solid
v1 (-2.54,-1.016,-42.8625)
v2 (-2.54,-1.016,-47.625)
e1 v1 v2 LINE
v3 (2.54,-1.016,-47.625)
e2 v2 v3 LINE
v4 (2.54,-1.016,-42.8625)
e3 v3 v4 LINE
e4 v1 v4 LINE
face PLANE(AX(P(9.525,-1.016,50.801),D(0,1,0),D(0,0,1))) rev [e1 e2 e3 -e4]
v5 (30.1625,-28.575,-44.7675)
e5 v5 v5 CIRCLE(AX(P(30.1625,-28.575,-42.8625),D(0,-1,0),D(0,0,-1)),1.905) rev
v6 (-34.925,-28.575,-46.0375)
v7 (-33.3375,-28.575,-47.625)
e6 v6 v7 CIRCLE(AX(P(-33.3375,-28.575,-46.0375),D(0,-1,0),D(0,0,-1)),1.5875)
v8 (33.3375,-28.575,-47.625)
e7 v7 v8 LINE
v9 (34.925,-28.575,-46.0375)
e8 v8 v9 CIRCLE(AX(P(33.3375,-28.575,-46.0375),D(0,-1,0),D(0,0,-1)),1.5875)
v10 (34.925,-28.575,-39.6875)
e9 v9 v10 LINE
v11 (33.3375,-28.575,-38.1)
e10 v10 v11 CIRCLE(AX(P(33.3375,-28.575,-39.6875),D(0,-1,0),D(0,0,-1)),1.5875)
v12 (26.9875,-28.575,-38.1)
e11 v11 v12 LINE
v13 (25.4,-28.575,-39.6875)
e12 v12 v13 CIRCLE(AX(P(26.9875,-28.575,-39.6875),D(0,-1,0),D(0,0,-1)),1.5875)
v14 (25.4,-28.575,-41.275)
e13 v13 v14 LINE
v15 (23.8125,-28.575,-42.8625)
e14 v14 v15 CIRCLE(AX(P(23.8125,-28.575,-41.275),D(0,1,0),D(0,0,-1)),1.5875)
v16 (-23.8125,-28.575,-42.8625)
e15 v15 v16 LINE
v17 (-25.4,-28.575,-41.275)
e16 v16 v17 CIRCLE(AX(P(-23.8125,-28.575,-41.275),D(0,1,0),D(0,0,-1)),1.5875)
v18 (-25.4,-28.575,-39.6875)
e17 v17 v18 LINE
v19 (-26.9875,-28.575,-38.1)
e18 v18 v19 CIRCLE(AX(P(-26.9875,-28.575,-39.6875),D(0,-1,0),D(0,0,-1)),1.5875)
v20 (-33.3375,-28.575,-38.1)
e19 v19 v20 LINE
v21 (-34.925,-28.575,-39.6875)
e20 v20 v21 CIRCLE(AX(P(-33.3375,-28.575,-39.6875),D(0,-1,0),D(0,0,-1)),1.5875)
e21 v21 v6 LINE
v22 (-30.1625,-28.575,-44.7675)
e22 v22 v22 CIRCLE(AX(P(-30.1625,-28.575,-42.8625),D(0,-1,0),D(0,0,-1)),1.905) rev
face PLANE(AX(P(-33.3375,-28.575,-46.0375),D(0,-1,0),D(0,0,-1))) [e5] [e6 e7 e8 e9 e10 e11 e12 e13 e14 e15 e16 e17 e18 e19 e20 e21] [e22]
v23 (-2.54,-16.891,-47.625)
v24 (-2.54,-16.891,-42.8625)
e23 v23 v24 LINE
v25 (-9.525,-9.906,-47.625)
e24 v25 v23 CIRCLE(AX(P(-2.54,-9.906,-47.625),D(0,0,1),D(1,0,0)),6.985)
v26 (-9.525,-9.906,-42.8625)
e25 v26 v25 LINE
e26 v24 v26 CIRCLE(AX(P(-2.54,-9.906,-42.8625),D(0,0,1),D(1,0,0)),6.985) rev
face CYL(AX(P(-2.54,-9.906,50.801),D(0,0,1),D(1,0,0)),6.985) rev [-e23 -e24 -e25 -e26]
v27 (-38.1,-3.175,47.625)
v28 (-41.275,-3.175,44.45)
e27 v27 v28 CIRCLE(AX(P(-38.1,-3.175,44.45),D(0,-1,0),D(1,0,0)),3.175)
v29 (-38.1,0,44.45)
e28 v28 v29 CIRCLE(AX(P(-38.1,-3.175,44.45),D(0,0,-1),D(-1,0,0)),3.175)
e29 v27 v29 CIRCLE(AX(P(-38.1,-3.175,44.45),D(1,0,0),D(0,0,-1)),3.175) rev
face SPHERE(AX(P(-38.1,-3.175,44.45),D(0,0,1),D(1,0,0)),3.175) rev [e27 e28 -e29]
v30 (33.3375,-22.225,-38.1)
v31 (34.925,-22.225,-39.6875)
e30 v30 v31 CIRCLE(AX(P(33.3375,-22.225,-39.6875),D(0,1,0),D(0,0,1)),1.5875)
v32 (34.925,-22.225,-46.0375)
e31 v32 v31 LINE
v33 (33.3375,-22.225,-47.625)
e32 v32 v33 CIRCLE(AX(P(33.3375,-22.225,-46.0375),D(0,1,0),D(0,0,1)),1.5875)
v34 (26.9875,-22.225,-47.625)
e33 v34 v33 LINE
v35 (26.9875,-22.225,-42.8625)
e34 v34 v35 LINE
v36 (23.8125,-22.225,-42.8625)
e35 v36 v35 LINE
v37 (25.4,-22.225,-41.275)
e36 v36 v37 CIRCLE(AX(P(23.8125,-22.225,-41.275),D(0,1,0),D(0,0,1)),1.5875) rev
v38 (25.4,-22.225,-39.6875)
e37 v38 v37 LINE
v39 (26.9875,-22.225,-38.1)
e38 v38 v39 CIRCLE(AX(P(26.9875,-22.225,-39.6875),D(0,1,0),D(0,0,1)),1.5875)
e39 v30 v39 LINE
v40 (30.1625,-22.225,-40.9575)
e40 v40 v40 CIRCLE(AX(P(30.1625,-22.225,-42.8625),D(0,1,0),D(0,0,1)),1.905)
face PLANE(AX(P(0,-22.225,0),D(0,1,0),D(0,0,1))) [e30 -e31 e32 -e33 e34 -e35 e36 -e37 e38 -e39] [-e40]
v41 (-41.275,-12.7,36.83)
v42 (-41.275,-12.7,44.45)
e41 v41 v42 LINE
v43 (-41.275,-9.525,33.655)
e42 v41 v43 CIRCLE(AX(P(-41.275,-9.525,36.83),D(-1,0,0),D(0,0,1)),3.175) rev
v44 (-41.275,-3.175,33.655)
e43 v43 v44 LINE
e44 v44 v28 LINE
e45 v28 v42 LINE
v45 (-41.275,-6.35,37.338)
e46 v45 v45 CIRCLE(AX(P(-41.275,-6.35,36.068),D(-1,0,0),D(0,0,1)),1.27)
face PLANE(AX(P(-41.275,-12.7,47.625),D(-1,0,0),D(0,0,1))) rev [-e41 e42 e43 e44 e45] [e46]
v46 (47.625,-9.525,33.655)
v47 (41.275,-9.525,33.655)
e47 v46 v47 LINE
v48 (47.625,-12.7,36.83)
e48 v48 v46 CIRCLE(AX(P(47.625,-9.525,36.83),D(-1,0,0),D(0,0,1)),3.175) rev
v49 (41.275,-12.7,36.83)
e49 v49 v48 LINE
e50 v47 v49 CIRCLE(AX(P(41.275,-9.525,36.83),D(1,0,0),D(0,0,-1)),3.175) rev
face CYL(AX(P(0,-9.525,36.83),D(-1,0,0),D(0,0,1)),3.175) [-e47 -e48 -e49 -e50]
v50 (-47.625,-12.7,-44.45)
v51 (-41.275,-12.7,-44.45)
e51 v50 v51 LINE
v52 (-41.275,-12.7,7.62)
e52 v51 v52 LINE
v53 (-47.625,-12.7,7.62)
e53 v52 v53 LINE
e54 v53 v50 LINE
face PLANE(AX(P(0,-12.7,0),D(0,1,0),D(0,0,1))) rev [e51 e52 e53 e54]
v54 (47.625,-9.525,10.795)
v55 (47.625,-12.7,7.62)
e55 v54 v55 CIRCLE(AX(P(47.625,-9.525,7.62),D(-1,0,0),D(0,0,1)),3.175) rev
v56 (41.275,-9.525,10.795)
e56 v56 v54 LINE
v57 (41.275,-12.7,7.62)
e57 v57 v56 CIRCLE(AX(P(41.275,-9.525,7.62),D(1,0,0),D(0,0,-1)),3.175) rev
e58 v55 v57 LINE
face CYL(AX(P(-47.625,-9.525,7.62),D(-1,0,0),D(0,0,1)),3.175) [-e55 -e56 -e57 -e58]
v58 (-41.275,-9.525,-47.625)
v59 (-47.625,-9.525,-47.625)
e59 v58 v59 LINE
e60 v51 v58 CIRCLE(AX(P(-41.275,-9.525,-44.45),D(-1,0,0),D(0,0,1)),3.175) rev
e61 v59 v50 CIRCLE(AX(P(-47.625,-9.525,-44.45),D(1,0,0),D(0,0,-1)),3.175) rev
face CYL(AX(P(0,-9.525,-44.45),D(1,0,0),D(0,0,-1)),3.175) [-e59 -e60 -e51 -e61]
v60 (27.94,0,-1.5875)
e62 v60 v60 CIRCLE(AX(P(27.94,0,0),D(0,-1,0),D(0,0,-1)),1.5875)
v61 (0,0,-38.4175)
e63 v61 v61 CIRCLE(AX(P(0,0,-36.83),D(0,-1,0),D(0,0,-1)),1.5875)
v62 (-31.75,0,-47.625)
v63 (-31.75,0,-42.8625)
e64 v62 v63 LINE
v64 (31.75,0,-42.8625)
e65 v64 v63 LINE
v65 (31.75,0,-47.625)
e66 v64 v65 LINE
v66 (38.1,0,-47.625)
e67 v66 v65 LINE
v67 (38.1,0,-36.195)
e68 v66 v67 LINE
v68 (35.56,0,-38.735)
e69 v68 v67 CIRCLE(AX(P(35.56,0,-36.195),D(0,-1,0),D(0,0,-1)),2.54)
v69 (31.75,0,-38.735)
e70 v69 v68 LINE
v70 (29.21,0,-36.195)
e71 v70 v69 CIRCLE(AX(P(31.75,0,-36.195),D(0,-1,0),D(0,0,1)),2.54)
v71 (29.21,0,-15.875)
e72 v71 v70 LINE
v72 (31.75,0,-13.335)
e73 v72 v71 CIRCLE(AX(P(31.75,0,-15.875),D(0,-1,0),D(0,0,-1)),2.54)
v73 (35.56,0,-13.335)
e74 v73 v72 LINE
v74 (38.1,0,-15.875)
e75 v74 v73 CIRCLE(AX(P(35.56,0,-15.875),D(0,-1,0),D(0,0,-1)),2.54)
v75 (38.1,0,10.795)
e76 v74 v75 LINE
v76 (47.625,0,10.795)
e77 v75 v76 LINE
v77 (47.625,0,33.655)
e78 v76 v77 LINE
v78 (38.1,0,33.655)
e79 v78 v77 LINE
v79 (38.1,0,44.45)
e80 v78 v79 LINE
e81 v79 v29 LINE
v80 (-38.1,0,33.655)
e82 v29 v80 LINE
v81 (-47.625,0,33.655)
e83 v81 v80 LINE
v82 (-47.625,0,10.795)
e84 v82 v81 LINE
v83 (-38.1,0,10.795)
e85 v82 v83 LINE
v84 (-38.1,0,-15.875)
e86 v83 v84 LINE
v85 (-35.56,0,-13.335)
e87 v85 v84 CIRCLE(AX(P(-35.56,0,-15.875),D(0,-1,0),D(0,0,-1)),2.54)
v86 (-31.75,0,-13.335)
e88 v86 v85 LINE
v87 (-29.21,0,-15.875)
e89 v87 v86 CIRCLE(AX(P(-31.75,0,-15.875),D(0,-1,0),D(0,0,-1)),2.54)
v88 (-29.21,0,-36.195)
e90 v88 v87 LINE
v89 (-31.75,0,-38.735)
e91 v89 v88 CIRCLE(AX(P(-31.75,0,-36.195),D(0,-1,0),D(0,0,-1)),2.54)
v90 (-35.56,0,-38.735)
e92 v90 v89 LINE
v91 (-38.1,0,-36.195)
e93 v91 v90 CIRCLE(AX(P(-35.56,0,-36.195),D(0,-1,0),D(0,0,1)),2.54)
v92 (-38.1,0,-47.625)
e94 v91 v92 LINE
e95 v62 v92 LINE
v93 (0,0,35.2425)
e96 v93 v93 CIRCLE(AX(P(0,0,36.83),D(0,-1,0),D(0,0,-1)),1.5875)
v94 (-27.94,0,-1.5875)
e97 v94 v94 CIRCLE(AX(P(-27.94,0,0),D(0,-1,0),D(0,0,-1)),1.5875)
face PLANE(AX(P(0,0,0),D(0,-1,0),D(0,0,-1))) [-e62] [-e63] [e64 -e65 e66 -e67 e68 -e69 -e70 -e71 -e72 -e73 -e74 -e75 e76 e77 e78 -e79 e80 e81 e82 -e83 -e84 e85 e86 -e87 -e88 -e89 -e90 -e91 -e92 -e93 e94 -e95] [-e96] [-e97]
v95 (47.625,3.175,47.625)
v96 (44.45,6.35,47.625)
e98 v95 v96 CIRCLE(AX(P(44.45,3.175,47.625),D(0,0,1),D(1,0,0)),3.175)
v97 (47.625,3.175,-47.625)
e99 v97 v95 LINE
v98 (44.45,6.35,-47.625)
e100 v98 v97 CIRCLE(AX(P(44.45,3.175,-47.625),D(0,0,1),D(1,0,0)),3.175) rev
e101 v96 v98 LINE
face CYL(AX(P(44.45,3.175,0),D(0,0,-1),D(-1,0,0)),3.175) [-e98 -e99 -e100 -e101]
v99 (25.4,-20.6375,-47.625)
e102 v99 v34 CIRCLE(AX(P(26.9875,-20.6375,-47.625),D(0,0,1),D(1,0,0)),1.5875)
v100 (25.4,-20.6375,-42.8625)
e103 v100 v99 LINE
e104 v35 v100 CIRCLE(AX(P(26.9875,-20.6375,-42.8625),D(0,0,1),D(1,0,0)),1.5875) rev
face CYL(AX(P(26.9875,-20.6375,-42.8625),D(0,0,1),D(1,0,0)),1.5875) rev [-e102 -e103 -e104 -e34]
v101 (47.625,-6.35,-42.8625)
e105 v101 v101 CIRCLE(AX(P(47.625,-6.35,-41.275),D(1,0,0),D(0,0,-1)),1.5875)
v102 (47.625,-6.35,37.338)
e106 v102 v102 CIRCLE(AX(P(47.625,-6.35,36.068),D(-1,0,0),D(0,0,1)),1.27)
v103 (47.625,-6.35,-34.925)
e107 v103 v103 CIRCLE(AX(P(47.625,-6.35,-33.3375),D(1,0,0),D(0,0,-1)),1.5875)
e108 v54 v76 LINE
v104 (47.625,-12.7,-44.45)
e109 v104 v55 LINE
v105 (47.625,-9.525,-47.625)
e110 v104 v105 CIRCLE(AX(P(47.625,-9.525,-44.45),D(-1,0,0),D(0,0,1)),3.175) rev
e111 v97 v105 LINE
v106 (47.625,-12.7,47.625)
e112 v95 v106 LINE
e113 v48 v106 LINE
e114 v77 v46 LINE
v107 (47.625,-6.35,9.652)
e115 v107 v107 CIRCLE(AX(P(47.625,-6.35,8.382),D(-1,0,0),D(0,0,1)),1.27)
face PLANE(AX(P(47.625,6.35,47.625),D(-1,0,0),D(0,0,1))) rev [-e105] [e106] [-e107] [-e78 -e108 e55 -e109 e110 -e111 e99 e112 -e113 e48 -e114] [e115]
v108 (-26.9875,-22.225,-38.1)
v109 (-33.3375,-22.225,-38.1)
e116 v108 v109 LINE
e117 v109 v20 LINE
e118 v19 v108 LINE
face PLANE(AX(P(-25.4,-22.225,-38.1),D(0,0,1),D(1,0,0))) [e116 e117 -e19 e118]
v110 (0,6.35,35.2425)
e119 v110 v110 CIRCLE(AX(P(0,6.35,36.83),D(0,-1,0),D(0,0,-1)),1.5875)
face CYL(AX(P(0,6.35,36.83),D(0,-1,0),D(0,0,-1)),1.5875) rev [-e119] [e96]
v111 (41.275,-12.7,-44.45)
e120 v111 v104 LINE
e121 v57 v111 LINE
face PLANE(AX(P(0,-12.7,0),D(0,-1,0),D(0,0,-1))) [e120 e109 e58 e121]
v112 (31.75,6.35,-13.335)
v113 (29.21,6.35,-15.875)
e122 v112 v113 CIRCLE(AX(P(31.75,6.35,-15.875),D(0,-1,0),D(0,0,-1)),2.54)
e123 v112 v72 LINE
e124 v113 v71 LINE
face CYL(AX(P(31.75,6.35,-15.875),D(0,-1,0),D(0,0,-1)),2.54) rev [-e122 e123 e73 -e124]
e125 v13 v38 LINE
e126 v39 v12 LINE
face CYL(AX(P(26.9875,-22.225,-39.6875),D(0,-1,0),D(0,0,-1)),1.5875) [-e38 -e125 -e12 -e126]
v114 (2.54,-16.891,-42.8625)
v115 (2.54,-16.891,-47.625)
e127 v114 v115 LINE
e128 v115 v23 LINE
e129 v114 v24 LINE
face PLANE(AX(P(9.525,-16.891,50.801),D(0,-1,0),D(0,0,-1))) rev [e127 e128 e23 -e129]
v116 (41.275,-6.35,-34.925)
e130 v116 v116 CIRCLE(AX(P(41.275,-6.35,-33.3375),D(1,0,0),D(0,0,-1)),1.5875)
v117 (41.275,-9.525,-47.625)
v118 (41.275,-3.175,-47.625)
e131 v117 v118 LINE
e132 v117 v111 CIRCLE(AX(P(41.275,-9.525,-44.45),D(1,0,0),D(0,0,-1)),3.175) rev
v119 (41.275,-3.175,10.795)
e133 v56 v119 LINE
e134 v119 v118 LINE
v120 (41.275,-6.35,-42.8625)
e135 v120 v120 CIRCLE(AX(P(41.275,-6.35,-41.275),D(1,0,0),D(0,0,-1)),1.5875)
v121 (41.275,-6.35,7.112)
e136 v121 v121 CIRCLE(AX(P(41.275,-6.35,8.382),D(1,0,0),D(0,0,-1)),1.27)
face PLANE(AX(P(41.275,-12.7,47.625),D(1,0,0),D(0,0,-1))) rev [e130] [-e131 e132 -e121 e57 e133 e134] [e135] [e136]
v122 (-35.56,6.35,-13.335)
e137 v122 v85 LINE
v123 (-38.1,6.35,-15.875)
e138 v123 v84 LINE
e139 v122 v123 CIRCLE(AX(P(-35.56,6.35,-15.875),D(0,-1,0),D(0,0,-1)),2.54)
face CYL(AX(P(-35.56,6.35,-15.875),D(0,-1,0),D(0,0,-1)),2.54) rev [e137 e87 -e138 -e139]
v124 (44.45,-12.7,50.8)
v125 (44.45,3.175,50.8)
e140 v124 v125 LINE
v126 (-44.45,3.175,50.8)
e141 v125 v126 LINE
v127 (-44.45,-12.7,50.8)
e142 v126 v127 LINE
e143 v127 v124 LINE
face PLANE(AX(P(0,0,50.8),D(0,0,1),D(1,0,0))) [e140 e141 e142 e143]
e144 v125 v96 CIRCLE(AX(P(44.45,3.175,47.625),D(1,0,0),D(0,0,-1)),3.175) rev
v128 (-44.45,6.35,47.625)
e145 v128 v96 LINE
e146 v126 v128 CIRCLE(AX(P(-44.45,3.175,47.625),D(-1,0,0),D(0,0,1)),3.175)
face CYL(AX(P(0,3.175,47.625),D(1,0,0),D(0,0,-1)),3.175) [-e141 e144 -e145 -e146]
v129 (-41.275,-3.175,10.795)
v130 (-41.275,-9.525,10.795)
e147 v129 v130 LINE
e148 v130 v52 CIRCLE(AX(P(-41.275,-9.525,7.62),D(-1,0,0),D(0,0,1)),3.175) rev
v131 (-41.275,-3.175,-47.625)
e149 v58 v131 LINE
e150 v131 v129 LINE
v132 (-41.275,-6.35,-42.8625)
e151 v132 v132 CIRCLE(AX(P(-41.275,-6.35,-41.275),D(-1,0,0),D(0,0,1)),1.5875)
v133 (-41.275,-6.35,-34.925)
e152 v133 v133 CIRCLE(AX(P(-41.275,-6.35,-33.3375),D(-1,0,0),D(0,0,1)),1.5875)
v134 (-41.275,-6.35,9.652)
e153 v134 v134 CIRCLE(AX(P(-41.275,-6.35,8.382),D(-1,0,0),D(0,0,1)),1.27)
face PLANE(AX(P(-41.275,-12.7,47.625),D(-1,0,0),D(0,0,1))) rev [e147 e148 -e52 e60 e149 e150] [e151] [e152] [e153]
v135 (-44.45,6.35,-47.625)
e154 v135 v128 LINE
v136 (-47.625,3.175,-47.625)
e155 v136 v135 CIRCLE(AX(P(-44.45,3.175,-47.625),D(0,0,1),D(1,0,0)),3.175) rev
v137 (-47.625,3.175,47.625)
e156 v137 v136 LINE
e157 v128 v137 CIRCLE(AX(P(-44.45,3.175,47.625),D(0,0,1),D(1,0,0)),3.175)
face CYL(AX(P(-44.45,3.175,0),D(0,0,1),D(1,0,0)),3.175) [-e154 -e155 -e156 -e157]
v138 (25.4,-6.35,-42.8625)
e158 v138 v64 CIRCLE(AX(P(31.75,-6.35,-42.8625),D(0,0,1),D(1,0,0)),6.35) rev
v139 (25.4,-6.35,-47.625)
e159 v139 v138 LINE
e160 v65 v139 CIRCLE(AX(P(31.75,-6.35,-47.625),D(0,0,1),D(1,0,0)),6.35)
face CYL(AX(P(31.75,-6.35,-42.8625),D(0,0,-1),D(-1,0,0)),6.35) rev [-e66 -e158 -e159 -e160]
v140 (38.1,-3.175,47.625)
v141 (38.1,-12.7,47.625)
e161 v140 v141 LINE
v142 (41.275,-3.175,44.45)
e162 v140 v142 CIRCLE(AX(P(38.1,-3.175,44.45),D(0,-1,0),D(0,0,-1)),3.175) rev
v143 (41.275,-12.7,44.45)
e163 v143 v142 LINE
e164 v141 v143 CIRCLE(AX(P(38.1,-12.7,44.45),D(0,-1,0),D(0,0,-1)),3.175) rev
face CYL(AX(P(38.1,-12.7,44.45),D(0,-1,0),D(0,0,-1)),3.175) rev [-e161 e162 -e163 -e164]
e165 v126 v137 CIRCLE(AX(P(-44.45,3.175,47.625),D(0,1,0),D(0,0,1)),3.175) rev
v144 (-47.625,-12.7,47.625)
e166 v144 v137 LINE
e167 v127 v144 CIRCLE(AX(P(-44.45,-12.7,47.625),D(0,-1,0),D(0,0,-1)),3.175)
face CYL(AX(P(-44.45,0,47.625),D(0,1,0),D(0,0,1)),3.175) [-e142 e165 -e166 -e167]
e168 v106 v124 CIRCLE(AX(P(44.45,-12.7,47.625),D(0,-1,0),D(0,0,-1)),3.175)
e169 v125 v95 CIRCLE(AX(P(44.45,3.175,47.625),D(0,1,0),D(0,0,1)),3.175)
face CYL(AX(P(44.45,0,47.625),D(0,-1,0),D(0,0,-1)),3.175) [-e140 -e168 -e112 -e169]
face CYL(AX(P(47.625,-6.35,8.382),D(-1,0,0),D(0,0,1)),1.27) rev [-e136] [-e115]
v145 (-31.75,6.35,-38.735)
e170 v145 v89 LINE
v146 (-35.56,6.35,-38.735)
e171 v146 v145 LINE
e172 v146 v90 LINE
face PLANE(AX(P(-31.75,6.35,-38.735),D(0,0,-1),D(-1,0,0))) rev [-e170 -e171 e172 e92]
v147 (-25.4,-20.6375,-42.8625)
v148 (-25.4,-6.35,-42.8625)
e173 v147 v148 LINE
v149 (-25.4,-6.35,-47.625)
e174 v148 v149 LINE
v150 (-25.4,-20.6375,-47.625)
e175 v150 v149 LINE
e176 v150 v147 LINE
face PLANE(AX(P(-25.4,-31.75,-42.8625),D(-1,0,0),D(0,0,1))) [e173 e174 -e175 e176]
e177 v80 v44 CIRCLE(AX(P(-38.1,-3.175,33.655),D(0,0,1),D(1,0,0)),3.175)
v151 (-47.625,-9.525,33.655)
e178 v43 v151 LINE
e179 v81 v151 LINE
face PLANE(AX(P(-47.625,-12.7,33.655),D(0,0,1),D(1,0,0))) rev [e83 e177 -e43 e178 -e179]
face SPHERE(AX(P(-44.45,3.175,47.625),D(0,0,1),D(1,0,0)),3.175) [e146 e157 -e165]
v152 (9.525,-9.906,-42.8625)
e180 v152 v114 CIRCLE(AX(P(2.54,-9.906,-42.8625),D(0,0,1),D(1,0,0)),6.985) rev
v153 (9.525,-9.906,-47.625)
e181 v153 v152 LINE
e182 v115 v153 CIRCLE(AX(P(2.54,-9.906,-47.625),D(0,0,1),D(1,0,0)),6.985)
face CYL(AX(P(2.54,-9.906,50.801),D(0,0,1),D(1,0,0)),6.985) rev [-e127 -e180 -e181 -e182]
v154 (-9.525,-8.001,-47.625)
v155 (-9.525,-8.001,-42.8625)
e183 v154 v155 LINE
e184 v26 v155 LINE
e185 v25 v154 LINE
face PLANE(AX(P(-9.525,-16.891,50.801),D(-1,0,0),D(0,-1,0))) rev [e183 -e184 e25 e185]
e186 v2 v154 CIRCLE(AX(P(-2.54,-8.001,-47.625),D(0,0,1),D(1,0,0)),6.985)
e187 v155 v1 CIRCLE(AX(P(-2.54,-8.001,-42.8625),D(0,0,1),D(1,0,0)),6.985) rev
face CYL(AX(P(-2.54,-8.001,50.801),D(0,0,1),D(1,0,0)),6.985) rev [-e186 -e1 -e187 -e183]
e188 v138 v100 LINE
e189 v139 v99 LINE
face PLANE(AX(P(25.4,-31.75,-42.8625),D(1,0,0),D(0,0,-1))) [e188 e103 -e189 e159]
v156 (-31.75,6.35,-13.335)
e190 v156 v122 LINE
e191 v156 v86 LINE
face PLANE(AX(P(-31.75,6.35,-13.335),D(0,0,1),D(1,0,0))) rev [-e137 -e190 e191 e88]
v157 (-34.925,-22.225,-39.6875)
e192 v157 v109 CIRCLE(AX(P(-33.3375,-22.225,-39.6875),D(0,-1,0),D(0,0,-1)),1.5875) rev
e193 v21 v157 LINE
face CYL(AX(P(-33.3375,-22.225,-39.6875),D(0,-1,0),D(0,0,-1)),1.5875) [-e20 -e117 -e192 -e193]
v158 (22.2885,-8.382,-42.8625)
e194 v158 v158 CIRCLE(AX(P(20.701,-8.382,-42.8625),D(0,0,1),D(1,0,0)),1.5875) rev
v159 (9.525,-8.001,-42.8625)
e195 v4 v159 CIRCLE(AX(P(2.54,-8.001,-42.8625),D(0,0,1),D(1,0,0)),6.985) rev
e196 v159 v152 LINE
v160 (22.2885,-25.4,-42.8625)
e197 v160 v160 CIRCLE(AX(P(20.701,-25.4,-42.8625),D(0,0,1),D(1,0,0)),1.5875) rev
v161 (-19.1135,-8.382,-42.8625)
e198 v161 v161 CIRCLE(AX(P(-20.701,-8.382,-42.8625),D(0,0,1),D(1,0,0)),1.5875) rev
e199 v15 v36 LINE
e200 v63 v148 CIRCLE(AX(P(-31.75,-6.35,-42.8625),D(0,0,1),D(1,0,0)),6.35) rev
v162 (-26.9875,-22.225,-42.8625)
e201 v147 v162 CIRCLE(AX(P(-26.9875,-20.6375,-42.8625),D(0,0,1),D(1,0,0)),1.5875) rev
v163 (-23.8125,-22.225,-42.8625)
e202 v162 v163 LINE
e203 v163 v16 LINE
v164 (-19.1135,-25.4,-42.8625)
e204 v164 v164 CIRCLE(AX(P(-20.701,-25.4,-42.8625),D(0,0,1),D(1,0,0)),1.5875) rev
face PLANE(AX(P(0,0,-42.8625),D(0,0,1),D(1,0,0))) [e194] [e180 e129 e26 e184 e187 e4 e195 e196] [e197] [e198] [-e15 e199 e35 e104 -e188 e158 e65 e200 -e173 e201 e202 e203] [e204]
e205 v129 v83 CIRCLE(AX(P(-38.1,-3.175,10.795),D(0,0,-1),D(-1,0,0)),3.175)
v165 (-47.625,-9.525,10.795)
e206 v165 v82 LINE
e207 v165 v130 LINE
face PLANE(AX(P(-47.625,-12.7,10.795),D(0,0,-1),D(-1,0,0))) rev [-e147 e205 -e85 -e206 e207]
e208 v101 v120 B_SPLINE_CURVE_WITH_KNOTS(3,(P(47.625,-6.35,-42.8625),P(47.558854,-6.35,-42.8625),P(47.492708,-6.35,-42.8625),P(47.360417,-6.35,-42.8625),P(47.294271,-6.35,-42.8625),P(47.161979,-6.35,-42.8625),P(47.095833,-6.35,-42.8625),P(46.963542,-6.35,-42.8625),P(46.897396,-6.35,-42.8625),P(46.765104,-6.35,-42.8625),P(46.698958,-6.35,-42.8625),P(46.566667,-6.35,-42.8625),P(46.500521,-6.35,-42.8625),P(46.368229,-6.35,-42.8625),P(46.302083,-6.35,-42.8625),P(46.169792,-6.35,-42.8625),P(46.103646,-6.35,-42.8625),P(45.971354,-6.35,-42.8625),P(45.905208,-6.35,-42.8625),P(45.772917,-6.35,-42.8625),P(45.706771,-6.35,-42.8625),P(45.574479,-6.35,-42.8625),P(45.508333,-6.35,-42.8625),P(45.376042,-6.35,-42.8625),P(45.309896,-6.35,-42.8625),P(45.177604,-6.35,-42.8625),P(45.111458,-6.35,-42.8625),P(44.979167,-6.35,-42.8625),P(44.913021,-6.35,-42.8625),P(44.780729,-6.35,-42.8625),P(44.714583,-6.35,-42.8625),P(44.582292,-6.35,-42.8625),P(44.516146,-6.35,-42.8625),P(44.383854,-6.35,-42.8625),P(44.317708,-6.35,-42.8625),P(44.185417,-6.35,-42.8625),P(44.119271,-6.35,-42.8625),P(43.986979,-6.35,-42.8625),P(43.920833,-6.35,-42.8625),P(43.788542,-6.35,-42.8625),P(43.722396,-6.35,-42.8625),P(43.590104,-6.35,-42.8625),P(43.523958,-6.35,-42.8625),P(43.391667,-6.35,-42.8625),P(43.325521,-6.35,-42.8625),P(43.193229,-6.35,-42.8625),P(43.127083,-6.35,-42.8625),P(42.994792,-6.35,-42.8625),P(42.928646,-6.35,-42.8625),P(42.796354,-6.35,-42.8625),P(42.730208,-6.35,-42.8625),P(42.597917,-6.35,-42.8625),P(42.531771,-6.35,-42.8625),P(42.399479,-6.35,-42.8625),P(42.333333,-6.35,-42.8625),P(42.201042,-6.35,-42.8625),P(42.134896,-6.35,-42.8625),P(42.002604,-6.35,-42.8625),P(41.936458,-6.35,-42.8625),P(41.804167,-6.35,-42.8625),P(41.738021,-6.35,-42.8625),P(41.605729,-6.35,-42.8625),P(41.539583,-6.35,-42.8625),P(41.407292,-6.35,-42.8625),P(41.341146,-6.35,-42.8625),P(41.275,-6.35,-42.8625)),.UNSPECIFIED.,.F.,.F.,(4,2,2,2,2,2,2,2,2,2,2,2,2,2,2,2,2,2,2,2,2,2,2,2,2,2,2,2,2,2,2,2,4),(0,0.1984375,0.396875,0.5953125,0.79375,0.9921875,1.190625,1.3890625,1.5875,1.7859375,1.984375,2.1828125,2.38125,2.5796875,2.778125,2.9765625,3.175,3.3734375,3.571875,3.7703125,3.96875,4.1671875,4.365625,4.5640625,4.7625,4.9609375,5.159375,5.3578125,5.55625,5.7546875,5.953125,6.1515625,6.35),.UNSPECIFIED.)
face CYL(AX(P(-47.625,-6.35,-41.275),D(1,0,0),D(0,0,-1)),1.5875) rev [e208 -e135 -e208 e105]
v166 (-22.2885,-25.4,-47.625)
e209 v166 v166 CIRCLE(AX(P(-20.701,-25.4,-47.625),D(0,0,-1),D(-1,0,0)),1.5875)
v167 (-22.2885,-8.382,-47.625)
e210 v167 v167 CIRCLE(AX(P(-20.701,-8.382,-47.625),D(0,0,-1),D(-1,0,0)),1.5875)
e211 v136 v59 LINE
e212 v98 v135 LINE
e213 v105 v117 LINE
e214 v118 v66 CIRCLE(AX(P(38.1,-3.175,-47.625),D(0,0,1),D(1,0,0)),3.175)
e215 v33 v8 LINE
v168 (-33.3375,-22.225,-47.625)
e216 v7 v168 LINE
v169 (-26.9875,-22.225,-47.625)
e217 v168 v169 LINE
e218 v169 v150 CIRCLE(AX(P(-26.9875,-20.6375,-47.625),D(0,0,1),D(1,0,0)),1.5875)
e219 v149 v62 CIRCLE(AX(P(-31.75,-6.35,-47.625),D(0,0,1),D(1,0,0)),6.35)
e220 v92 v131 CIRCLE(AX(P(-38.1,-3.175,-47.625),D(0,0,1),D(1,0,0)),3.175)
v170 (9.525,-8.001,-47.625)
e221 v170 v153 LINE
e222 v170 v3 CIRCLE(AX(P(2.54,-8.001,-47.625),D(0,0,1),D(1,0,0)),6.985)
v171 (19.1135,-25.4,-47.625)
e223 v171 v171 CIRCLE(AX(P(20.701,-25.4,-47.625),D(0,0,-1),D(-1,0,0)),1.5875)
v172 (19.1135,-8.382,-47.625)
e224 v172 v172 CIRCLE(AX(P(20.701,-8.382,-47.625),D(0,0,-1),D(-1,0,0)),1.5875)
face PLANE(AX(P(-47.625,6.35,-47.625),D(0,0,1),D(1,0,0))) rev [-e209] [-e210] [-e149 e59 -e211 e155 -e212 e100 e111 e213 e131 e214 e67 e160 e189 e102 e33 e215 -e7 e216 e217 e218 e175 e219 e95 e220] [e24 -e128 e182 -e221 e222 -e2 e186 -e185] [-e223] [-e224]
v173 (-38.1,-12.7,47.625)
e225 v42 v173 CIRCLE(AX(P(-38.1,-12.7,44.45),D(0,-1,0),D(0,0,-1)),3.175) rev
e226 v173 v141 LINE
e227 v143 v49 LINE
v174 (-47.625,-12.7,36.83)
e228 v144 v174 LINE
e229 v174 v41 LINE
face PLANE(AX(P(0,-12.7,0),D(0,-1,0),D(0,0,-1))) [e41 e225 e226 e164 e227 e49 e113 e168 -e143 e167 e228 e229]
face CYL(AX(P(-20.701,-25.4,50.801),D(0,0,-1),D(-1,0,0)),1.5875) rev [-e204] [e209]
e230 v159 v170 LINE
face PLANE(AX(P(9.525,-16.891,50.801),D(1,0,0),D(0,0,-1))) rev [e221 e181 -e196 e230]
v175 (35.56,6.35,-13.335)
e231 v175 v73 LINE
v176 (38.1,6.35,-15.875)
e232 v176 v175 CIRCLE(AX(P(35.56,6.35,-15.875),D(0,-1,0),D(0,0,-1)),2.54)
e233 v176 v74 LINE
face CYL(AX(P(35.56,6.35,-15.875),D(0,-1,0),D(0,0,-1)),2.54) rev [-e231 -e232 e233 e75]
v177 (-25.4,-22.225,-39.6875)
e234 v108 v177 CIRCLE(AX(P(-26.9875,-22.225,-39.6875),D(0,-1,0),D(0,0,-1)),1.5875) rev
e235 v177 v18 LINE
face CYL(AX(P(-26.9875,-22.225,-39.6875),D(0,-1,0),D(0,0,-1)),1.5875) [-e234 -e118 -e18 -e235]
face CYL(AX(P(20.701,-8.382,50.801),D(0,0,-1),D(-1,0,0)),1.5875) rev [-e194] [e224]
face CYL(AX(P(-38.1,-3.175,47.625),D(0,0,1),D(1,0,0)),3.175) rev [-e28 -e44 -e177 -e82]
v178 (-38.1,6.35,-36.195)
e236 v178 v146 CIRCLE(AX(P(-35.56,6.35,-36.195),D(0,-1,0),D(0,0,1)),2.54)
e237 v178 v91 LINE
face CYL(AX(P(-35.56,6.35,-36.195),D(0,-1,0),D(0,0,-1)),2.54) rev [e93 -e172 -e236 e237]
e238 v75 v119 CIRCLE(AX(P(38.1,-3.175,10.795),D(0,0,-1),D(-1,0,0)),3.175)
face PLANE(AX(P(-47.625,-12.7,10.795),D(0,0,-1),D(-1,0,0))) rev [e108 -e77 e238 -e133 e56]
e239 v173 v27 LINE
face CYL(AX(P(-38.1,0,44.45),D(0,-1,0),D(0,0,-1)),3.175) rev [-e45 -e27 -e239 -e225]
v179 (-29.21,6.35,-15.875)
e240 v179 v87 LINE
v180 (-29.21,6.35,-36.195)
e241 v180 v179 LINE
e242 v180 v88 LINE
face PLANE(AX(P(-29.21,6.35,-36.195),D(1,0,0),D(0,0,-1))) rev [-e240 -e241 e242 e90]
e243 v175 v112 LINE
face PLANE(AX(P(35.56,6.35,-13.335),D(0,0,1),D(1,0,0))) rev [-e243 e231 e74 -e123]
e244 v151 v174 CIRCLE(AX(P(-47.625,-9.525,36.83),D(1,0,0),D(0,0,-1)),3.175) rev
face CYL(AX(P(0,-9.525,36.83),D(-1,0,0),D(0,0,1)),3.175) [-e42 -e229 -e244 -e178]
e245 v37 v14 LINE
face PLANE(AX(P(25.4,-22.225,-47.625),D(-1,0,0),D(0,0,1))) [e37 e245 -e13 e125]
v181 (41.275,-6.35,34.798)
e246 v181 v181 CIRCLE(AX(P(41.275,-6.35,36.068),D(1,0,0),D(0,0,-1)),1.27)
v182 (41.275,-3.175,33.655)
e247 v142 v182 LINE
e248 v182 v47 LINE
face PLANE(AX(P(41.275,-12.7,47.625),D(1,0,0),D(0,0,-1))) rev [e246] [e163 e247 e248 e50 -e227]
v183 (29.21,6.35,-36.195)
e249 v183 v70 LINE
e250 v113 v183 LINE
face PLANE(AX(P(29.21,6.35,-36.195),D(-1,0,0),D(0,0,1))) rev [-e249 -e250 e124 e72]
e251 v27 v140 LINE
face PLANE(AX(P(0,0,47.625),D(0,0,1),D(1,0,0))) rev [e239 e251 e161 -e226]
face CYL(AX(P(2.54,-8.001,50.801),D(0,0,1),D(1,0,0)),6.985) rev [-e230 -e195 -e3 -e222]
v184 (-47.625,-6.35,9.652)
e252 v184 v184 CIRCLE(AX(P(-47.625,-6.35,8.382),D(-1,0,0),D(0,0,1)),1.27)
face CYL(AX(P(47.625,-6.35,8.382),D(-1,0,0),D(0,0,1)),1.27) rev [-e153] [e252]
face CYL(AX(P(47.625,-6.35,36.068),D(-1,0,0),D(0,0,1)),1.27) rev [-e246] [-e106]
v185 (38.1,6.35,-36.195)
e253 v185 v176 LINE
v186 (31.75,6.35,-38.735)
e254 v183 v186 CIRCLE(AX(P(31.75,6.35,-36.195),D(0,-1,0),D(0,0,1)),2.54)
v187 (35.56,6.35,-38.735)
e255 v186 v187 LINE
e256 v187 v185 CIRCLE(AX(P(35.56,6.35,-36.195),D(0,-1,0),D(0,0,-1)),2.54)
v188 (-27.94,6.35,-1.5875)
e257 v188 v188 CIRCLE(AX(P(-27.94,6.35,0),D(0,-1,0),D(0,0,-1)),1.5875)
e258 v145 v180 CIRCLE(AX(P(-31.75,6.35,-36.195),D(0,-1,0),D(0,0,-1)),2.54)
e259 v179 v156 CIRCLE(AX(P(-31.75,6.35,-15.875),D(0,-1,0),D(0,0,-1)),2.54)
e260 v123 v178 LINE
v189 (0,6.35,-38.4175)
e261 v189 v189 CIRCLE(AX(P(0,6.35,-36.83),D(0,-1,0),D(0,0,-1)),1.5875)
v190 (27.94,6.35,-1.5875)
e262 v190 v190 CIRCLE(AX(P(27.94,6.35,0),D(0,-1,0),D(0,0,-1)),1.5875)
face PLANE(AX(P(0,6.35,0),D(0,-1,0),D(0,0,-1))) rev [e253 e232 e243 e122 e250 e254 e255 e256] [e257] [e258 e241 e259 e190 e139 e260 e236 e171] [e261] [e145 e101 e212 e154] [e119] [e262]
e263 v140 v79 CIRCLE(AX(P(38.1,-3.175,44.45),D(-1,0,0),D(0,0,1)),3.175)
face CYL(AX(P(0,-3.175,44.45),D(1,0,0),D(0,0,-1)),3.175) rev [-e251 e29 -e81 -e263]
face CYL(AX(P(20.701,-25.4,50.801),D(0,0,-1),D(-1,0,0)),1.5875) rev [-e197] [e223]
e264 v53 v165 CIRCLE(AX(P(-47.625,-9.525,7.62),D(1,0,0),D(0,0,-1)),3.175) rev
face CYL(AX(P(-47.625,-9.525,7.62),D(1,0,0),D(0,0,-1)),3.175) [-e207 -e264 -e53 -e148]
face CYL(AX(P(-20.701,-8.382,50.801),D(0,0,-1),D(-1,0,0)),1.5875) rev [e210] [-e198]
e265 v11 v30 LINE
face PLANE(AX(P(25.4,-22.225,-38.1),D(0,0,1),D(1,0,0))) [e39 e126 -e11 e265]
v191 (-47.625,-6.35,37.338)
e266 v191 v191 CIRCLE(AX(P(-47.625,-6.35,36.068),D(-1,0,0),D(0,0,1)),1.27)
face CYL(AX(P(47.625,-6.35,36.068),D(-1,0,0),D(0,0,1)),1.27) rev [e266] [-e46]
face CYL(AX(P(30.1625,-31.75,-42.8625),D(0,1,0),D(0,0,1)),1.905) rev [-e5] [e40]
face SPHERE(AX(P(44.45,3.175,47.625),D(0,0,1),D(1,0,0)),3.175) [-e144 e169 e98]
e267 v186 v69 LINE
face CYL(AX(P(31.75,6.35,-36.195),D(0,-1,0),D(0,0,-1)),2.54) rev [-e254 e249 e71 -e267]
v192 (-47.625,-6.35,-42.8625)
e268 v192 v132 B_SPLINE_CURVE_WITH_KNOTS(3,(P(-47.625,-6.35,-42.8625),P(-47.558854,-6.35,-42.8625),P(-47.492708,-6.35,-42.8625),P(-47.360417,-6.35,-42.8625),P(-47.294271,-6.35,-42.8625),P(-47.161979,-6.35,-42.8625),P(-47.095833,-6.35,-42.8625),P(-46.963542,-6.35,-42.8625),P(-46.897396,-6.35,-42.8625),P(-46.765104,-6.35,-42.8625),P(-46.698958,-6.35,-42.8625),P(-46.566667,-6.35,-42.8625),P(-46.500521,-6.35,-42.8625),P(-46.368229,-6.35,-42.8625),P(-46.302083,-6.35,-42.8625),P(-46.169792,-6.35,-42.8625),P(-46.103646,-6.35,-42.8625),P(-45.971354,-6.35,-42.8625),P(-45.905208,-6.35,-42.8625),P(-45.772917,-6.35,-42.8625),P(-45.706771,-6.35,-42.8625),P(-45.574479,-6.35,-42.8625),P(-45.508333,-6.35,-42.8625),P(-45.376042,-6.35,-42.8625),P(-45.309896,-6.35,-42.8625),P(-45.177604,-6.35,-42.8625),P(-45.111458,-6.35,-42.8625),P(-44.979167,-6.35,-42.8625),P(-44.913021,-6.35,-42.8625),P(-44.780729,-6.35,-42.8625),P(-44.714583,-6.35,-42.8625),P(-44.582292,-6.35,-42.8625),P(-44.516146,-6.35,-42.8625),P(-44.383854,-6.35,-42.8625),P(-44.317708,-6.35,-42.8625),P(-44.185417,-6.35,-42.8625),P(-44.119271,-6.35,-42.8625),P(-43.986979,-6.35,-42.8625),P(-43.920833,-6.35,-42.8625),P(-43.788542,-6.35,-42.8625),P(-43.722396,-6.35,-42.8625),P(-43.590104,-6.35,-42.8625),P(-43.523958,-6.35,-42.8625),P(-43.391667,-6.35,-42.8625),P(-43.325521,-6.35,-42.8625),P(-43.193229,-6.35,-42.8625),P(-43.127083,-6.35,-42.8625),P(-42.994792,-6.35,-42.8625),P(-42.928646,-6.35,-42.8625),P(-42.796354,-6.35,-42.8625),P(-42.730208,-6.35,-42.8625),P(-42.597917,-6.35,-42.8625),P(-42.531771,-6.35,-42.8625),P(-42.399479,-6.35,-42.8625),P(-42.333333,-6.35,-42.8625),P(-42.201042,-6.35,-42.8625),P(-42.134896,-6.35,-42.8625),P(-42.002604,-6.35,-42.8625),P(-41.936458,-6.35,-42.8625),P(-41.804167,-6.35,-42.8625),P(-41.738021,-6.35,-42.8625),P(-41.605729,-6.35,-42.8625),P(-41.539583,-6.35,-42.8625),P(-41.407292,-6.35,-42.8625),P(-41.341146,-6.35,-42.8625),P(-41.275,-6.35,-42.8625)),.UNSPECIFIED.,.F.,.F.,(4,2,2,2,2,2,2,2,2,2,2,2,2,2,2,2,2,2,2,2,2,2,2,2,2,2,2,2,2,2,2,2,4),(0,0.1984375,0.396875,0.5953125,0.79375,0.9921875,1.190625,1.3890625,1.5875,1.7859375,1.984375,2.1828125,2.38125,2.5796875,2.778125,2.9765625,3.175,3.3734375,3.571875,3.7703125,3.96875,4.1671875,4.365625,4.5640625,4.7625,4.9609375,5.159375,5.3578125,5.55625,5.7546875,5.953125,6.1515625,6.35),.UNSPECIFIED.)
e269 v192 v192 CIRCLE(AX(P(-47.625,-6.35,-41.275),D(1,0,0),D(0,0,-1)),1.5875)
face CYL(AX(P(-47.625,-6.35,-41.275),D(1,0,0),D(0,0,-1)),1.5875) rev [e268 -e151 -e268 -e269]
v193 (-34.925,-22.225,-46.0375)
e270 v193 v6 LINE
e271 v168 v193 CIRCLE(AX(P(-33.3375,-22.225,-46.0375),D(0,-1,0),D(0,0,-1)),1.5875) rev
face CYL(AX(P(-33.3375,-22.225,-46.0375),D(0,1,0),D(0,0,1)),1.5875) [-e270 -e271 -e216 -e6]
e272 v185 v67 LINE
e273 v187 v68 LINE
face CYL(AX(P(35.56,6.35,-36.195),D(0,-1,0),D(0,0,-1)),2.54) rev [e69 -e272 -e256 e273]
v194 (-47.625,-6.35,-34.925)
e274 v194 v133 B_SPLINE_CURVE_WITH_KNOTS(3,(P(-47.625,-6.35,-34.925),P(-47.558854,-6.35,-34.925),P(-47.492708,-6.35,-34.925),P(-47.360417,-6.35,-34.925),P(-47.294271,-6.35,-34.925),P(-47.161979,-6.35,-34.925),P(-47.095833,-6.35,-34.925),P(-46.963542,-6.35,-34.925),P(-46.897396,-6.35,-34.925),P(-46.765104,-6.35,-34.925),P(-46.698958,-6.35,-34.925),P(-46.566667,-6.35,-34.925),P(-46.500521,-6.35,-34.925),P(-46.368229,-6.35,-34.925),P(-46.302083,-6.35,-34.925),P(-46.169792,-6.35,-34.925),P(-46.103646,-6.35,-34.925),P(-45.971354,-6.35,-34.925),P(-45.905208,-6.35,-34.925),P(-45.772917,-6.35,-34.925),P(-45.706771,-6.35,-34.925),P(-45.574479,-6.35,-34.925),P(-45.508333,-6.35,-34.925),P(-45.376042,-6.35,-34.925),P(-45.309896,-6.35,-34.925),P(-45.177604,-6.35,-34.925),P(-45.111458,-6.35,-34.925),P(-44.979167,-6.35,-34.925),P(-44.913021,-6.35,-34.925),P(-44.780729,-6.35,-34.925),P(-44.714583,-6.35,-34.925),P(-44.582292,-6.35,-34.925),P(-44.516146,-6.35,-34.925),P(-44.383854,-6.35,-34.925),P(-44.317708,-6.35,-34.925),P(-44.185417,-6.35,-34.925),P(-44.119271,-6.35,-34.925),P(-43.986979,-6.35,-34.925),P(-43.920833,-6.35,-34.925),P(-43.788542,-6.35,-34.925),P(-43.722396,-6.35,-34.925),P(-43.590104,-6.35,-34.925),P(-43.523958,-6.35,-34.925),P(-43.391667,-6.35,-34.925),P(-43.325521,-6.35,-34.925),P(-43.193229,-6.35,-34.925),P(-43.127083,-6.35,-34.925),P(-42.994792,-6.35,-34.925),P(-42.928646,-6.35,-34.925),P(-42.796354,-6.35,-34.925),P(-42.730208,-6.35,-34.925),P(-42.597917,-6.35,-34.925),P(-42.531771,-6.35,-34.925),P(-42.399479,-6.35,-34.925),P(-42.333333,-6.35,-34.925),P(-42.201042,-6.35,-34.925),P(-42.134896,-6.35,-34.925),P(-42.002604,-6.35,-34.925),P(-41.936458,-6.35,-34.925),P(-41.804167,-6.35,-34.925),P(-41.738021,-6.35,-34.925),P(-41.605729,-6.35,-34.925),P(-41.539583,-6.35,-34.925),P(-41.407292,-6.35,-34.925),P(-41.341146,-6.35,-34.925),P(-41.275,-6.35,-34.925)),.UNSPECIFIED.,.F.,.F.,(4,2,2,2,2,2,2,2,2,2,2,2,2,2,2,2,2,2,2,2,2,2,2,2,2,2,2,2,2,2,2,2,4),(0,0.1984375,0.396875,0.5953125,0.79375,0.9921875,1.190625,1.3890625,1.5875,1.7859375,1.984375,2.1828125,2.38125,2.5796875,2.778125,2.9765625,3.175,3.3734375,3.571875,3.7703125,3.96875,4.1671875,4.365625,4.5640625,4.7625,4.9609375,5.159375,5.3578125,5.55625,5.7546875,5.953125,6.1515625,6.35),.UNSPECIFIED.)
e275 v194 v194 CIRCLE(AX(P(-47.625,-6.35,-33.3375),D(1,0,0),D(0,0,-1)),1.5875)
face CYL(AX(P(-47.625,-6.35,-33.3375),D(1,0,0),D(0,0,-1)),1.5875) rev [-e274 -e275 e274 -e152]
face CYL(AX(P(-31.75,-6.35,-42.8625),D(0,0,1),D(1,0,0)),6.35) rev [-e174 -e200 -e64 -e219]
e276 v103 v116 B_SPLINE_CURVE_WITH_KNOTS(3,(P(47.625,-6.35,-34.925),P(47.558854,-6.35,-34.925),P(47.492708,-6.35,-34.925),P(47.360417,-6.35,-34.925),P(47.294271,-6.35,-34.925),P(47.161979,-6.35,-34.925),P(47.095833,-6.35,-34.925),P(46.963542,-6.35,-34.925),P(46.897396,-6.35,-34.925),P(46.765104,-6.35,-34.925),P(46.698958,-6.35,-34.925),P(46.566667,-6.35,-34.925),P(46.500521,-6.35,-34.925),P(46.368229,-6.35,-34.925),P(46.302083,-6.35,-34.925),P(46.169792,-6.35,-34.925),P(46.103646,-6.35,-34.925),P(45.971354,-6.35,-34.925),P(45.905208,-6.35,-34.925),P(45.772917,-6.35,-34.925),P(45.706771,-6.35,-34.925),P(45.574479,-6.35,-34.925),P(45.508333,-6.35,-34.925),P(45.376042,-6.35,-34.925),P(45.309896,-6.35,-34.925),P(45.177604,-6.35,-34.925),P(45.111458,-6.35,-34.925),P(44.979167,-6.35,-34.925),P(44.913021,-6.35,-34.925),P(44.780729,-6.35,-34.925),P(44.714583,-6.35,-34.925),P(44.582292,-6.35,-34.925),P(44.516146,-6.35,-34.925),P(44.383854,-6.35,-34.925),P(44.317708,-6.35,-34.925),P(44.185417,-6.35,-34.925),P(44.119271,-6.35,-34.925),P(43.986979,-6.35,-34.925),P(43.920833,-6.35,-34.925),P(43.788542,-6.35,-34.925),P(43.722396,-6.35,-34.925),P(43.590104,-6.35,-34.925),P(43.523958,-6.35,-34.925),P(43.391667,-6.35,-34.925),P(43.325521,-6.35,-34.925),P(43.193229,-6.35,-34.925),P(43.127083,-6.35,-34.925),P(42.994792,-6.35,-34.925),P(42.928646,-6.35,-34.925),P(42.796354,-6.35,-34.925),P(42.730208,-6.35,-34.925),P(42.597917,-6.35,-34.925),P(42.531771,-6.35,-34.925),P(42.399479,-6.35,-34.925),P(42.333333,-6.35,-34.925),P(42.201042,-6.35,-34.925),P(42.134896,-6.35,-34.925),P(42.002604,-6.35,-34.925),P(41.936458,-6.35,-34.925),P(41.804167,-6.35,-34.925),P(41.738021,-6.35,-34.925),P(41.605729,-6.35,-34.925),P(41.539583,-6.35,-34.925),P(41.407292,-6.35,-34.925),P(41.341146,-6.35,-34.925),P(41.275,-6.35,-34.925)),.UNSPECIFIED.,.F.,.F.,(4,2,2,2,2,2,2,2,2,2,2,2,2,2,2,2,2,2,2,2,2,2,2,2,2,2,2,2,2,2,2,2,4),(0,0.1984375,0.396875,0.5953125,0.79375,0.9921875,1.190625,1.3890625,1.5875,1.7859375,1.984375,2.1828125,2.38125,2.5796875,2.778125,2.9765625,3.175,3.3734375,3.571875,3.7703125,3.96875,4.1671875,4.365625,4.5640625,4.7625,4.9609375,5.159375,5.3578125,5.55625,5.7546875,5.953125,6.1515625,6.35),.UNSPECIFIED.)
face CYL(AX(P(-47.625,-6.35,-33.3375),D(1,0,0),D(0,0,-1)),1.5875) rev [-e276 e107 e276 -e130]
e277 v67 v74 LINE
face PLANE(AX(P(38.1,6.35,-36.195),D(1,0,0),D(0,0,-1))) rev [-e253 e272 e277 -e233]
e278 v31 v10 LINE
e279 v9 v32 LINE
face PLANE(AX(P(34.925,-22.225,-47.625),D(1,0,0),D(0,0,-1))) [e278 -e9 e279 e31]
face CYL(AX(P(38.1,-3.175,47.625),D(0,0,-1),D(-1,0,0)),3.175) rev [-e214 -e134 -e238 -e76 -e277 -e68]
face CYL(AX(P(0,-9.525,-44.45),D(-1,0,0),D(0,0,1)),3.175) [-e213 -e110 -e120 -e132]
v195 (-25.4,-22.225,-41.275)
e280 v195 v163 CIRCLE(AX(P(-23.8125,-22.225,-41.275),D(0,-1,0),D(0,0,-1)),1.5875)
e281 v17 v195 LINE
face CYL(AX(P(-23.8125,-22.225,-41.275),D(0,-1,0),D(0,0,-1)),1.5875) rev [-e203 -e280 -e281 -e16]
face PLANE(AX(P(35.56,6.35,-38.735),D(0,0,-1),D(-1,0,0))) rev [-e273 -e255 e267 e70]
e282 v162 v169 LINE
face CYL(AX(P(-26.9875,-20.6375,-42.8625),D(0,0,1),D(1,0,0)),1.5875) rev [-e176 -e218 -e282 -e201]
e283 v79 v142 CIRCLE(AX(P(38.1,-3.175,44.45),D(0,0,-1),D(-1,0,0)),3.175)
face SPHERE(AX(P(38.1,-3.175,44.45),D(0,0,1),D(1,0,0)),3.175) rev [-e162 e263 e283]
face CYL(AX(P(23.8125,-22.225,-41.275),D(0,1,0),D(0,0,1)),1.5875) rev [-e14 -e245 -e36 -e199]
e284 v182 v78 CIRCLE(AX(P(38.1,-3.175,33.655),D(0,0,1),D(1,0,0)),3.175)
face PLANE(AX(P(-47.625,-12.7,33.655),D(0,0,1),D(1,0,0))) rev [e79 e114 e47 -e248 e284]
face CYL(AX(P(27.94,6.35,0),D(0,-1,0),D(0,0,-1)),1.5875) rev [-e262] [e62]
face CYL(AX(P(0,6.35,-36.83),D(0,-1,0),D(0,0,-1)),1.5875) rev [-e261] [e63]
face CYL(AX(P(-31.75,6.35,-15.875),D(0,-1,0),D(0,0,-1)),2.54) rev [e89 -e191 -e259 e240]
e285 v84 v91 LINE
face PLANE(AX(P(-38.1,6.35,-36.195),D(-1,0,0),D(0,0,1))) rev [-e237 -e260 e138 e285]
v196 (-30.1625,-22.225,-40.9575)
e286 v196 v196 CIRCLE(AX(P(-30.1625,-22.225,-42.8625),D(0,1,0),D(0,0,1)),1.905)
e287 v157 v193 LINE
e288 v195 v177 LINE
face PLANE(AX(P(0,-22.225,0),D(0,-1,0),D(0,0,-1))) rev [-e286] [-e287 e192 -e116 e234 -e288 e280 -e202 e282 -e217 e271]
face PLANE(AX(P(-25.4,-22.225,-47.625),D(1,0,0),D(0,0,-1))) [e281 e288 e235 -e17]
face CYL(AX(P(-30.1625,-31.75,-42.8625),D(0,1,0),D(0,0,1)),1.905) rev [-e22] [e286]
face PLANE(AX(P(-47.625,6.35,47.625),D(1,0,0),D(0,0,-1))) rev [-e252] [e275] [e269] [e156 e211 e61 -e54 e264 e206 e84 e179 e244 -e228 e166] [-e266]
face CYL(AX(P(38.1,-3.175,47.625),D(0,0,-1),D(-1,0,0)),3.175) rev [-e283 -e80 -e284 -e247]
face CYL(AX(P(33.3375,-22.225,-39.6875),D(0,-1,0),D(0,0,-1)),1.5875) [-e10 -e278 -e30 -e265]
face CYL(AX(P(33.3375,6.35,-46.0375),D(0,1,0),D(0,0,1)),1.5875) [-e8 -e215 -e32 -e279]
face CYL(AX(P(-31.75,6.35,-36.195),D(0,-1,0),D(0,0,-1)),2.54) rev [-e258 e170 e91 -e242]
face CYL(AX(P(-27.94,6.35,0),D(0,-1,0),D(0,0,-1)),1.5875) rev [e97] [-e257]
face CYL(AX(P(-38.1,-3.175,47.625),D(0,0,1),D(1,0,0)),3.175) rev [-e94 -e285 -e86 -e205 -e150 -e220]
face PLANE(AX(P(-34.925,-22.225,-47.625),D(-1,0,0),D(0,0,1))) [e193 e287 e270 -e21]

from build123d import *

# Parameters (mm, degrees)
SKETCH1_W               = 95.25
SKETCH1_H               = 95.25
BOSS_EXTRUDE1_DEPTH     = 6.35
SKETCH4_W               = 6.35
SKETCH4_H               = 95.25
BOSS_EXTRUDE2_DEPTH     = 12.7
CUT_EXTRUDE1_DEPTH      = 102.649597269
CUT_EXTRUDE1_DEPTH_BACK = 102.649597269
SKETCH5_W               = 22.86
SKETCH5_H               = 12.7
SKETCH6_R               = 1.27
CUT_EXTRUDE2_DEPTH      = 108.247345538
SKETCH7_R               = 1.5875
CUT_EXTRUDE3_DEPTH      = 69.538830235
CUT_EXTRUDE4_DEPTH      = 102.649597269
CUT_EXTRUDE4_DEPTH_BACK = 102.649597269
SKETCH8_R               = 1.5875
SKETCH9_W               = 95.25
SKETCH9_H               = 19.05
BOSS_EXTRUDE3_DEPTH     = 3.175
CUT_EXTRUDE5_DEPTH      = 71.781852371
SKETCH11_W              = 50.8
SKETCH11_H              = 38.1
BOSS_EXTRUDE4_DEPTH     = 4.7625
CUT_EXTRUDE6_REACH      = 115.858
SKETCH12_R              = 1.5875
SKETCH12_W              = 19.05
SKETCH12_H              = 15.875
FILLET1_R               = 6.985
FILLET2_R               = 6.35
FILLET3_R               = 3.175
FILLET4_R               = 3.175
FILLET5_R               = 3.175
SKETCH14_W              = 9.525
SKETCH14_H              = 9.525
BOSS_EXTRUDE5_DEPTH     = 9.525
SKETCH15_R              = 1.905
CUT_EXTRUDE7_DEPTH      = 76.268261904
FILLET7_R               = 1.5875
FILLET8_R               = 1.5875
CUT_EXTRUDE8_START      = -3.175
CUT_EXTRUDE8_DEPTH      = 3.175


with BuildPart() as part:
    # Sketch1 → Boss-Extrude1 (new body)
    with BuildSketch(Plane(origin=(0, 0, 0), x_dir=(1, 0, 0), z_dir=(0, 1, 0))):
        Rectangle(SKETCH1_W, SKETCH1_H)
    extrude(amount=BOSS_EXTRUDE1_DEPTH)

    # Sketch4 → Boss-Extrude2 (add)
    with BuildSketch(Plane(origin=(0, 0, 0), x_dir=(-1, 0, 0), z_dir=(0, -1, 0))):
        with Locations((-44.45, 0)):
            Rectangle(SKETCH4_W, SKETCH4_H)
        with Locations((44.45, 0)):
            Rectangle(SKETCH4_W, SKETCH4_H)
    extrude(amount=BOSS_EXTRUDE2_DEPTH)

    # Sketch5 → Cut-Extrude1 (cut, two sides: drawn at the far end of the back side and taken through both)
    with BuildSketch(Plane(origin=(-41.275, 0, 0), x_dir=(0, 0, -1), z_dir=(1, 0, 0)).offset(-CUT_EXTRUDE1_DEPTH_BACK)):
        with Locations((-22.225, -6.35)):
            Rectangle(SKETCH5_W, SKETCH5_H)
    extrude(amount=CUT_EXTRUDE1_DEPTH + CUT_EXTRUDE1_DEPTH_BACK, mode=Mode.SUBTRACT)

    # Sketch6 → Cut-Extrude2 (cut, through all)
    with BuildSketch(Plane.ZY.offset(47.625)):
        with Locations((36.068, -6.35)):
            Circle(SKETCH6_R)
        with Locations((8.382, -6.35)):
            Circle(SKETCH6_R)
    extrude(amount=-CUT_EXTRUDE2_DEPTH, mode=Mode.SUBTRACT)

    # Sketch7 → Cut-Extrude3 (cut, through all)
    with BuildSketch(Plane.XZ):
        with Locations(Location((27.94, 0, 0), (0, 0, 270))):
            Circle(SKETCH7_R)
        with Locations(Location((-27.94, 0, 0), (0, 0, 270))):
            Circle(SKETCH7_R)
        with Locations(Location((0, 36.83, 0), (0, 0, 270))):
            Circle(SKETCH7_R)
        with Locations(Location((0, -36.83, 0), (0, 0, 270))):
            Circle(SKETCH7_R)
    extrude(amount=-CUT_EXTRUDE3_DEPTH, mode=Mode.SUBTRACT)

    # Sketch8 → Cut-Extrude4 (cut, two sides: drawn at the far end of the back side and taken through both)
    with BuildSketch(Plane(origin=(-41.275, 0, 0), x_dir=(0, 0, -1), z_dir=(1, 0, 0)).offset(-CUT_EXTRUDE4_DEPTH_BACK)):
        with Locations((41.275, -6.35)):
            Circle(SKETCH8_R)
        with Locations((33.3375, -6.35)):
            Circle(SKETCH8_R)
    extrude(amount=CUT_EXTRUDE4_DEPTH + CUT_EXTRUDE4_DEPTH_BACK, mode=Mode.SUBTRACT)

    # Sketch9 → Boss-Extrude3 (add)
    with BuildSketch(Plane.XY.offset(47.625)):
        with Locations((0, -3.175)):
            Rectangle(SKETCH9_W, SKETCH9_H)
    extrude(amount=BOSS_EXTRUDE3_DEPTH)

    # Sketch10 → Cut-Extrude5 (cut, through all)
    with BuildSketch(Plane.XZ):
        with BuildLine():
            Line((-31.75, -38.735), (-35.56, -38.735))
            ThreePointArc((-35.56, -38.735), (-37.356051224, -37.991051224), (-38.1, -36.195))
            Line((-38.1, -36.195), (-38.1, -15.875))
            ThreePointArc((-38.1, -15.875), (-37.356051224, -14.078948776), (-35.56, -13.335))
            Line((-35.56, -13.335), (-31.75, -13.335))
            ThreePointArc((-31.75, -13.335), (-29.953948776, -14.078948776), (-29.21, -15.875))
            Line((-29.21, -15.875), (-29.21, -36.195))
            ThreePointArc((-29.21, -36.195), (-29.953948776, -37.991051224), (-31.75, -38.735))
        make_face()
        with BuildLine():
            Line((35.56, -38.735), (31.75, -38.735))
            ThreePointArc((31.75, -38.735), (29.953948776, -37.991051224), (29.21, -36.195))
            Line((29.21, -36.195), (29.21, -15.875))
            ThreePointArc((29.21, -15.875), (29.953948776, -14.078948776), (31.75, -13.335))
            Line((31.75, -13.335), (35.56, -13.335))
            ThreePointArc((35.56, -13.335), (37.356051224, -14.078948776), (38.1, -15.875))
            Line((38.1, -15.875), (38.1, -36.195))
            ThreePointArc((38.1, -36.195), (37.356051224, -37.991051224), (35.56, -38.735))
        make_face()
    extrude(amount=-CUT_EXTRUDE5_DEPTH, mode=Mode.SUBTRACT)

    # Sketch11 → Boss-Extrude4 (add)
    with BuildSketch(Plane(origin=(0, 0, -47.625), x_dir=(-1, 0, 0), z_dir=(0, 0, -1))):
        with Locations((0, -12.7)):
            Rectangle(SKETCH11_W, SKETCH11_H)
    extrude(amount=-BOSS_EXTRUDE4_DEPTH)

    # Sketch12 → Cut-Extrude6 (cut, up to next)
    with BuildSketch(Plane(origin=(0, 0, -47.625), x_dir=(-1, 0, 0), z_dir=(0, 0, -1)), mode=Mode.PRIVATE) as cut_extrude6_sk1:
        with Locations((-20.701, -8.382)):
            Circle(SKETCH12_R)
    cut_extrude6_tool1 = extrude(cut_extrude6_sk1.sketch, amount=-CUT_EXTRUDE6_REACH, mode=Mode.PRIVATE) & part.part
    # Sketch12 → Cut-Extrude6 (cut, up to next)
    with BuildSketch(Plane(origin=(0, 0, -47.625), x_dir=(-1, 0, 0), z_dir=(0, 0, -1)), mode=Mode.PRIVATE) as cut_extrude6_sk2:
        with Locations((-20.701, -25.4)):
            Circle(SKETCH12_R)
    cut_extrude6_tool2 = extrude(cut_extrude6_sk2.sketch, amount=-CUT_EXTRUDE6_REACH, mode=Mode.PRIVATE) & part.part
    # Sketch12 → Cut-Extrude6 (cut, up to next)
    with BuildSketch(Plane(origin=(0, 0, -47.625), x_dir=(-1, 0, 0), z_dir=(0, 0, -1)), mode=Mode.PRIVATE) as cut_extrude6_sk3:
        with Locations((20.701, -8.382)):
            Circle(SKETCH12_R)
    cut_extrude6_tool3 = extrude(cut_extrude6_sk3.sketch, amount=-CUT_EXTRUDE6_REACH, mode=Mode.PRIVATE) & part.part
    # Sketch12 → Cut-Extrude6 (cut, up to next)
    with BuildSketch(Plane(origin=(0, 0, -47.625), x_dir=(-1, 0, 0), z_dir=(0, 0, -1)), mode=Mode.PRIVATE) as cut_extrude6_sk4:
        with Locations((20.701, -25.4)):
            Circle(SKETCH12_R)
    cut_extrude6_tool4 = extrude(cut_extrude6_sk4.sketch, amount=-CUT_EXTRUDE6_REACH, mode=Mode.PRIVATE) & part.part
    # Sketch12 → Cut-Extrude6 (cut, up to next)
    with BuildSketch(Plane(origin=(0, 0, -47.625), x_dir=(-1, 0, 0), z_dir=(0, 0, -1)), mode=Mode.PRIVATE) as cut_extrude6_sk5:
        with Locations((0, -8.9535)):
            Rectangle(SKETCH12_W, SKETCH12_H)
    cut_extrude6_tool5 = extrude(cut_extrude6_sk5.sketch, amount=-CUT_EXTRUDE6_REACH, mode=Mode.PRIVATE) & part.part
    add(cut_extrude6_tool1.solids().sort_by_distance((20.701, -8.382, -47.625))[0], mode=Mode.SUBTRACT)
    add(cut_extrude6_tool2.solids().sort_by_distance((20.701, -25.4, -47.625))[0], mode=Mode.SUBTRACT)
    add(cut_extrude6_tool3.solids().sort_by_distance((-20.701, -8.382, -47.625))[0], mode=Mode.SUBTRACT)
    add(cut_extrude6_tool4.solids().sort_by_distance((-20.701, -25.4, -47.625))[0], mode=Mode.SUBTRACT)
    add(cut_extrude6_tool5.solids().sort_by_distance((0, -8.9535, -47.625))[0], mode=Mode.SUBTRACT)

    # Fillet1
    fillet1_edges = [part.edges().sort_by_distance(p)[0] for p in [
        (9.525, -1.016, -45.24375),
        (9.525, -16.891, -45.24375),
        (-9.525, -16.891, -45.24375),
        (-9.525, -1.016, -45.24375),
    ]]
    fillet(fillet1_edges, radius=FILLET1_R)

    # Fillet2
    fillet2_edges = [part.edges().sort_by_distance(p)[0] for p in [
        (-25.4, 0, -45.24375),
        (25.4, 0, -45.24375),
    ]]
    fillet(fillet2_edges, radius=FILLET2_R)

    # Fillet3
    fillet3_edges = [part.edges().sort_by_distance(p)[0] for p in [
        (44.45, -12.7, -47.625),
        (-44.45, -12.7, -47.625),
        (44.45, -12.7, 10.795),
        (-44.45, -12.7, 10.795),
        (44.45, -12.7, 33.655),
        (-44.45, -12.7, 33.655),
    ]]
    fillet(fillet3_edges, radius=FILLET3_R)

    # Fillet4
    fillet4_edges = [part.edges().sort_by_distance(p)[0] for p in [
        (41.275, 0, 40.64),
        (41.275, -6.35, 47.625),
        (0, 0, 47.625),
        (-41.275, 0, -18.415),
        (-41.275, -6.35, 47.625),
        (-41.275, 0, 40.64),
        (41.275, 0, -18.415),
    ]]
    fillet(fillet4_edges, radius=FILLET4_R - 0.0001)  # a hair under: the kernel refuses the full size

    # Fillet5
    fillet5_edges = [part.edges().sort_by_distance(p)[0] for p in [
        (-47.625, 6.35, 1.5875),
        (-47.625, -3.175, 50.8),
        (47.625, -3.175, 50.8),
        (0, 6.35, 50.8),
        (47.625, 6.35, 1.5875),
    ]]
    fillet(fillet5_edges, radius=FILLET5_R)

    # Sketch14 → Boss-Extrude5 (add)
    with BuildSketch(Plane.XZ.offset(31.75)):
        with Locations((-30.1625, -42.8625)):
            Rectangle(SKETCH14_W, SKETCH14_H)
        with Locations((30.1625, -42.8625)):
            Rectangle(SKETCH14_W, SKETCH14_H)
    extrude(amount=-BOSS_EXTRUDE5_DEPTH)

    # Sketch15 → Cut-Extrude7 (cut, through all)
    with BuildSketch(Plane(origin=(0, -22.225, 0), x_dir=(1, 0, 0), z_dir=(0, 1, 0))):
        with Locations(Location((-30.1625, 42.8625, 0), (0, 0, 270))):
            Circle(SKETCH15_R)
        with Locations(Location((30.1625, 42.8625, 0), (0, 0, 270))):
            Circle(SKETCH15_R)
    extrude(amount=-CUT_EXTRUDE7_DEPTH, mode=Mode.SUBTRACT)

    # Fillet7
    fillet7_edges = [part.edges().sort_by_distance(p)[0] for p in [
        (-25.4, -26.9875, -42.8625),
        (-25.4, -26.9875, -38.1),
        (-34.925, -26.9875, -47.625),
        (-34.925, -26.9875, -38.1),
        (25.4, -26.9875, -42.8625),
        (25.4, -26.9875, -38.1),
        (34.925, -26.9875, -38.1),
        (34.925, -26.9875, -47.625),
    ]]
    fillet(fillet7_edges, radius=FILLET7_R)

    # Fillet8
    fillet8_edges = [part.edges().sort_by_distance(p)[0] for p in [
        (-25.4, -22.225, -45.24375),
        (25.4, -22.225, -45.24375),
    ]]
    fillet(fillet8_edges, radius=FILLET8_R)

    # Sketch16 → Cut-Extrude8 (cut)
    with BuildSketch(Plane.XZ.offset(31.75).offset(CUT_EXTRUDE8_START)):
        with BuildLine():
            Line((-33.3375, -47.625), (33.3375, -47.625))
            ThreePointArc((33.3375, -47.625), (34.460032015, -47.160032015), (34.925, -46.0375))
            Line((34.925, -46.0375), (34.925, -39.6875))
            ThreePointArc((34.925, -39.6875), (34.460032015, -38.564967985), (33.3375, -38.1))
            Line((33.3375, -38.1), (26.9875, -38.1))
            ThreePointArc((26.9875, -38.1), (25.864967985, -38.564967985), (25.4, -39.6875))
            Line((25.4, -39.6875), (25.4, -41.275))
            ThreePointArc((25.4, -41.275), (24.935032015, -42.397532015), (23.8125, -42.8625))
            Line((23.8125, -42.8625), (-23.8125, -42.8625))
            ThreePointArc((-23.8125, -42.8625), (-24.935032015, -42.397532015), (-25.4, -41.275))
            Line((-25.4, -41.275), (-25.4, -39.6875))
            ThreePointArc((-25.4, -39.6875), (-25.864967985, -38.564967985), (-26.9875, -38.1))
            Line((-26.9875, -38.1), (-33.3375, -38.1))
            ThreePointArc((-33.3375, -38.1), (-34.460032015, -38.564967985), (-34.925, -39.6875))
            Line((-34.925, -39.6875), (-34.925, -46.0375))
            ThreePointArc((-34.925, -46.0375), (-34.460032015, -47.160032015), (-33.3375, -47.625))
        make_face()
    extrude(amount=CUT_EXTRUDE8_DEPTH, mode=Mode.SUBTRACT)


solid = part.part
